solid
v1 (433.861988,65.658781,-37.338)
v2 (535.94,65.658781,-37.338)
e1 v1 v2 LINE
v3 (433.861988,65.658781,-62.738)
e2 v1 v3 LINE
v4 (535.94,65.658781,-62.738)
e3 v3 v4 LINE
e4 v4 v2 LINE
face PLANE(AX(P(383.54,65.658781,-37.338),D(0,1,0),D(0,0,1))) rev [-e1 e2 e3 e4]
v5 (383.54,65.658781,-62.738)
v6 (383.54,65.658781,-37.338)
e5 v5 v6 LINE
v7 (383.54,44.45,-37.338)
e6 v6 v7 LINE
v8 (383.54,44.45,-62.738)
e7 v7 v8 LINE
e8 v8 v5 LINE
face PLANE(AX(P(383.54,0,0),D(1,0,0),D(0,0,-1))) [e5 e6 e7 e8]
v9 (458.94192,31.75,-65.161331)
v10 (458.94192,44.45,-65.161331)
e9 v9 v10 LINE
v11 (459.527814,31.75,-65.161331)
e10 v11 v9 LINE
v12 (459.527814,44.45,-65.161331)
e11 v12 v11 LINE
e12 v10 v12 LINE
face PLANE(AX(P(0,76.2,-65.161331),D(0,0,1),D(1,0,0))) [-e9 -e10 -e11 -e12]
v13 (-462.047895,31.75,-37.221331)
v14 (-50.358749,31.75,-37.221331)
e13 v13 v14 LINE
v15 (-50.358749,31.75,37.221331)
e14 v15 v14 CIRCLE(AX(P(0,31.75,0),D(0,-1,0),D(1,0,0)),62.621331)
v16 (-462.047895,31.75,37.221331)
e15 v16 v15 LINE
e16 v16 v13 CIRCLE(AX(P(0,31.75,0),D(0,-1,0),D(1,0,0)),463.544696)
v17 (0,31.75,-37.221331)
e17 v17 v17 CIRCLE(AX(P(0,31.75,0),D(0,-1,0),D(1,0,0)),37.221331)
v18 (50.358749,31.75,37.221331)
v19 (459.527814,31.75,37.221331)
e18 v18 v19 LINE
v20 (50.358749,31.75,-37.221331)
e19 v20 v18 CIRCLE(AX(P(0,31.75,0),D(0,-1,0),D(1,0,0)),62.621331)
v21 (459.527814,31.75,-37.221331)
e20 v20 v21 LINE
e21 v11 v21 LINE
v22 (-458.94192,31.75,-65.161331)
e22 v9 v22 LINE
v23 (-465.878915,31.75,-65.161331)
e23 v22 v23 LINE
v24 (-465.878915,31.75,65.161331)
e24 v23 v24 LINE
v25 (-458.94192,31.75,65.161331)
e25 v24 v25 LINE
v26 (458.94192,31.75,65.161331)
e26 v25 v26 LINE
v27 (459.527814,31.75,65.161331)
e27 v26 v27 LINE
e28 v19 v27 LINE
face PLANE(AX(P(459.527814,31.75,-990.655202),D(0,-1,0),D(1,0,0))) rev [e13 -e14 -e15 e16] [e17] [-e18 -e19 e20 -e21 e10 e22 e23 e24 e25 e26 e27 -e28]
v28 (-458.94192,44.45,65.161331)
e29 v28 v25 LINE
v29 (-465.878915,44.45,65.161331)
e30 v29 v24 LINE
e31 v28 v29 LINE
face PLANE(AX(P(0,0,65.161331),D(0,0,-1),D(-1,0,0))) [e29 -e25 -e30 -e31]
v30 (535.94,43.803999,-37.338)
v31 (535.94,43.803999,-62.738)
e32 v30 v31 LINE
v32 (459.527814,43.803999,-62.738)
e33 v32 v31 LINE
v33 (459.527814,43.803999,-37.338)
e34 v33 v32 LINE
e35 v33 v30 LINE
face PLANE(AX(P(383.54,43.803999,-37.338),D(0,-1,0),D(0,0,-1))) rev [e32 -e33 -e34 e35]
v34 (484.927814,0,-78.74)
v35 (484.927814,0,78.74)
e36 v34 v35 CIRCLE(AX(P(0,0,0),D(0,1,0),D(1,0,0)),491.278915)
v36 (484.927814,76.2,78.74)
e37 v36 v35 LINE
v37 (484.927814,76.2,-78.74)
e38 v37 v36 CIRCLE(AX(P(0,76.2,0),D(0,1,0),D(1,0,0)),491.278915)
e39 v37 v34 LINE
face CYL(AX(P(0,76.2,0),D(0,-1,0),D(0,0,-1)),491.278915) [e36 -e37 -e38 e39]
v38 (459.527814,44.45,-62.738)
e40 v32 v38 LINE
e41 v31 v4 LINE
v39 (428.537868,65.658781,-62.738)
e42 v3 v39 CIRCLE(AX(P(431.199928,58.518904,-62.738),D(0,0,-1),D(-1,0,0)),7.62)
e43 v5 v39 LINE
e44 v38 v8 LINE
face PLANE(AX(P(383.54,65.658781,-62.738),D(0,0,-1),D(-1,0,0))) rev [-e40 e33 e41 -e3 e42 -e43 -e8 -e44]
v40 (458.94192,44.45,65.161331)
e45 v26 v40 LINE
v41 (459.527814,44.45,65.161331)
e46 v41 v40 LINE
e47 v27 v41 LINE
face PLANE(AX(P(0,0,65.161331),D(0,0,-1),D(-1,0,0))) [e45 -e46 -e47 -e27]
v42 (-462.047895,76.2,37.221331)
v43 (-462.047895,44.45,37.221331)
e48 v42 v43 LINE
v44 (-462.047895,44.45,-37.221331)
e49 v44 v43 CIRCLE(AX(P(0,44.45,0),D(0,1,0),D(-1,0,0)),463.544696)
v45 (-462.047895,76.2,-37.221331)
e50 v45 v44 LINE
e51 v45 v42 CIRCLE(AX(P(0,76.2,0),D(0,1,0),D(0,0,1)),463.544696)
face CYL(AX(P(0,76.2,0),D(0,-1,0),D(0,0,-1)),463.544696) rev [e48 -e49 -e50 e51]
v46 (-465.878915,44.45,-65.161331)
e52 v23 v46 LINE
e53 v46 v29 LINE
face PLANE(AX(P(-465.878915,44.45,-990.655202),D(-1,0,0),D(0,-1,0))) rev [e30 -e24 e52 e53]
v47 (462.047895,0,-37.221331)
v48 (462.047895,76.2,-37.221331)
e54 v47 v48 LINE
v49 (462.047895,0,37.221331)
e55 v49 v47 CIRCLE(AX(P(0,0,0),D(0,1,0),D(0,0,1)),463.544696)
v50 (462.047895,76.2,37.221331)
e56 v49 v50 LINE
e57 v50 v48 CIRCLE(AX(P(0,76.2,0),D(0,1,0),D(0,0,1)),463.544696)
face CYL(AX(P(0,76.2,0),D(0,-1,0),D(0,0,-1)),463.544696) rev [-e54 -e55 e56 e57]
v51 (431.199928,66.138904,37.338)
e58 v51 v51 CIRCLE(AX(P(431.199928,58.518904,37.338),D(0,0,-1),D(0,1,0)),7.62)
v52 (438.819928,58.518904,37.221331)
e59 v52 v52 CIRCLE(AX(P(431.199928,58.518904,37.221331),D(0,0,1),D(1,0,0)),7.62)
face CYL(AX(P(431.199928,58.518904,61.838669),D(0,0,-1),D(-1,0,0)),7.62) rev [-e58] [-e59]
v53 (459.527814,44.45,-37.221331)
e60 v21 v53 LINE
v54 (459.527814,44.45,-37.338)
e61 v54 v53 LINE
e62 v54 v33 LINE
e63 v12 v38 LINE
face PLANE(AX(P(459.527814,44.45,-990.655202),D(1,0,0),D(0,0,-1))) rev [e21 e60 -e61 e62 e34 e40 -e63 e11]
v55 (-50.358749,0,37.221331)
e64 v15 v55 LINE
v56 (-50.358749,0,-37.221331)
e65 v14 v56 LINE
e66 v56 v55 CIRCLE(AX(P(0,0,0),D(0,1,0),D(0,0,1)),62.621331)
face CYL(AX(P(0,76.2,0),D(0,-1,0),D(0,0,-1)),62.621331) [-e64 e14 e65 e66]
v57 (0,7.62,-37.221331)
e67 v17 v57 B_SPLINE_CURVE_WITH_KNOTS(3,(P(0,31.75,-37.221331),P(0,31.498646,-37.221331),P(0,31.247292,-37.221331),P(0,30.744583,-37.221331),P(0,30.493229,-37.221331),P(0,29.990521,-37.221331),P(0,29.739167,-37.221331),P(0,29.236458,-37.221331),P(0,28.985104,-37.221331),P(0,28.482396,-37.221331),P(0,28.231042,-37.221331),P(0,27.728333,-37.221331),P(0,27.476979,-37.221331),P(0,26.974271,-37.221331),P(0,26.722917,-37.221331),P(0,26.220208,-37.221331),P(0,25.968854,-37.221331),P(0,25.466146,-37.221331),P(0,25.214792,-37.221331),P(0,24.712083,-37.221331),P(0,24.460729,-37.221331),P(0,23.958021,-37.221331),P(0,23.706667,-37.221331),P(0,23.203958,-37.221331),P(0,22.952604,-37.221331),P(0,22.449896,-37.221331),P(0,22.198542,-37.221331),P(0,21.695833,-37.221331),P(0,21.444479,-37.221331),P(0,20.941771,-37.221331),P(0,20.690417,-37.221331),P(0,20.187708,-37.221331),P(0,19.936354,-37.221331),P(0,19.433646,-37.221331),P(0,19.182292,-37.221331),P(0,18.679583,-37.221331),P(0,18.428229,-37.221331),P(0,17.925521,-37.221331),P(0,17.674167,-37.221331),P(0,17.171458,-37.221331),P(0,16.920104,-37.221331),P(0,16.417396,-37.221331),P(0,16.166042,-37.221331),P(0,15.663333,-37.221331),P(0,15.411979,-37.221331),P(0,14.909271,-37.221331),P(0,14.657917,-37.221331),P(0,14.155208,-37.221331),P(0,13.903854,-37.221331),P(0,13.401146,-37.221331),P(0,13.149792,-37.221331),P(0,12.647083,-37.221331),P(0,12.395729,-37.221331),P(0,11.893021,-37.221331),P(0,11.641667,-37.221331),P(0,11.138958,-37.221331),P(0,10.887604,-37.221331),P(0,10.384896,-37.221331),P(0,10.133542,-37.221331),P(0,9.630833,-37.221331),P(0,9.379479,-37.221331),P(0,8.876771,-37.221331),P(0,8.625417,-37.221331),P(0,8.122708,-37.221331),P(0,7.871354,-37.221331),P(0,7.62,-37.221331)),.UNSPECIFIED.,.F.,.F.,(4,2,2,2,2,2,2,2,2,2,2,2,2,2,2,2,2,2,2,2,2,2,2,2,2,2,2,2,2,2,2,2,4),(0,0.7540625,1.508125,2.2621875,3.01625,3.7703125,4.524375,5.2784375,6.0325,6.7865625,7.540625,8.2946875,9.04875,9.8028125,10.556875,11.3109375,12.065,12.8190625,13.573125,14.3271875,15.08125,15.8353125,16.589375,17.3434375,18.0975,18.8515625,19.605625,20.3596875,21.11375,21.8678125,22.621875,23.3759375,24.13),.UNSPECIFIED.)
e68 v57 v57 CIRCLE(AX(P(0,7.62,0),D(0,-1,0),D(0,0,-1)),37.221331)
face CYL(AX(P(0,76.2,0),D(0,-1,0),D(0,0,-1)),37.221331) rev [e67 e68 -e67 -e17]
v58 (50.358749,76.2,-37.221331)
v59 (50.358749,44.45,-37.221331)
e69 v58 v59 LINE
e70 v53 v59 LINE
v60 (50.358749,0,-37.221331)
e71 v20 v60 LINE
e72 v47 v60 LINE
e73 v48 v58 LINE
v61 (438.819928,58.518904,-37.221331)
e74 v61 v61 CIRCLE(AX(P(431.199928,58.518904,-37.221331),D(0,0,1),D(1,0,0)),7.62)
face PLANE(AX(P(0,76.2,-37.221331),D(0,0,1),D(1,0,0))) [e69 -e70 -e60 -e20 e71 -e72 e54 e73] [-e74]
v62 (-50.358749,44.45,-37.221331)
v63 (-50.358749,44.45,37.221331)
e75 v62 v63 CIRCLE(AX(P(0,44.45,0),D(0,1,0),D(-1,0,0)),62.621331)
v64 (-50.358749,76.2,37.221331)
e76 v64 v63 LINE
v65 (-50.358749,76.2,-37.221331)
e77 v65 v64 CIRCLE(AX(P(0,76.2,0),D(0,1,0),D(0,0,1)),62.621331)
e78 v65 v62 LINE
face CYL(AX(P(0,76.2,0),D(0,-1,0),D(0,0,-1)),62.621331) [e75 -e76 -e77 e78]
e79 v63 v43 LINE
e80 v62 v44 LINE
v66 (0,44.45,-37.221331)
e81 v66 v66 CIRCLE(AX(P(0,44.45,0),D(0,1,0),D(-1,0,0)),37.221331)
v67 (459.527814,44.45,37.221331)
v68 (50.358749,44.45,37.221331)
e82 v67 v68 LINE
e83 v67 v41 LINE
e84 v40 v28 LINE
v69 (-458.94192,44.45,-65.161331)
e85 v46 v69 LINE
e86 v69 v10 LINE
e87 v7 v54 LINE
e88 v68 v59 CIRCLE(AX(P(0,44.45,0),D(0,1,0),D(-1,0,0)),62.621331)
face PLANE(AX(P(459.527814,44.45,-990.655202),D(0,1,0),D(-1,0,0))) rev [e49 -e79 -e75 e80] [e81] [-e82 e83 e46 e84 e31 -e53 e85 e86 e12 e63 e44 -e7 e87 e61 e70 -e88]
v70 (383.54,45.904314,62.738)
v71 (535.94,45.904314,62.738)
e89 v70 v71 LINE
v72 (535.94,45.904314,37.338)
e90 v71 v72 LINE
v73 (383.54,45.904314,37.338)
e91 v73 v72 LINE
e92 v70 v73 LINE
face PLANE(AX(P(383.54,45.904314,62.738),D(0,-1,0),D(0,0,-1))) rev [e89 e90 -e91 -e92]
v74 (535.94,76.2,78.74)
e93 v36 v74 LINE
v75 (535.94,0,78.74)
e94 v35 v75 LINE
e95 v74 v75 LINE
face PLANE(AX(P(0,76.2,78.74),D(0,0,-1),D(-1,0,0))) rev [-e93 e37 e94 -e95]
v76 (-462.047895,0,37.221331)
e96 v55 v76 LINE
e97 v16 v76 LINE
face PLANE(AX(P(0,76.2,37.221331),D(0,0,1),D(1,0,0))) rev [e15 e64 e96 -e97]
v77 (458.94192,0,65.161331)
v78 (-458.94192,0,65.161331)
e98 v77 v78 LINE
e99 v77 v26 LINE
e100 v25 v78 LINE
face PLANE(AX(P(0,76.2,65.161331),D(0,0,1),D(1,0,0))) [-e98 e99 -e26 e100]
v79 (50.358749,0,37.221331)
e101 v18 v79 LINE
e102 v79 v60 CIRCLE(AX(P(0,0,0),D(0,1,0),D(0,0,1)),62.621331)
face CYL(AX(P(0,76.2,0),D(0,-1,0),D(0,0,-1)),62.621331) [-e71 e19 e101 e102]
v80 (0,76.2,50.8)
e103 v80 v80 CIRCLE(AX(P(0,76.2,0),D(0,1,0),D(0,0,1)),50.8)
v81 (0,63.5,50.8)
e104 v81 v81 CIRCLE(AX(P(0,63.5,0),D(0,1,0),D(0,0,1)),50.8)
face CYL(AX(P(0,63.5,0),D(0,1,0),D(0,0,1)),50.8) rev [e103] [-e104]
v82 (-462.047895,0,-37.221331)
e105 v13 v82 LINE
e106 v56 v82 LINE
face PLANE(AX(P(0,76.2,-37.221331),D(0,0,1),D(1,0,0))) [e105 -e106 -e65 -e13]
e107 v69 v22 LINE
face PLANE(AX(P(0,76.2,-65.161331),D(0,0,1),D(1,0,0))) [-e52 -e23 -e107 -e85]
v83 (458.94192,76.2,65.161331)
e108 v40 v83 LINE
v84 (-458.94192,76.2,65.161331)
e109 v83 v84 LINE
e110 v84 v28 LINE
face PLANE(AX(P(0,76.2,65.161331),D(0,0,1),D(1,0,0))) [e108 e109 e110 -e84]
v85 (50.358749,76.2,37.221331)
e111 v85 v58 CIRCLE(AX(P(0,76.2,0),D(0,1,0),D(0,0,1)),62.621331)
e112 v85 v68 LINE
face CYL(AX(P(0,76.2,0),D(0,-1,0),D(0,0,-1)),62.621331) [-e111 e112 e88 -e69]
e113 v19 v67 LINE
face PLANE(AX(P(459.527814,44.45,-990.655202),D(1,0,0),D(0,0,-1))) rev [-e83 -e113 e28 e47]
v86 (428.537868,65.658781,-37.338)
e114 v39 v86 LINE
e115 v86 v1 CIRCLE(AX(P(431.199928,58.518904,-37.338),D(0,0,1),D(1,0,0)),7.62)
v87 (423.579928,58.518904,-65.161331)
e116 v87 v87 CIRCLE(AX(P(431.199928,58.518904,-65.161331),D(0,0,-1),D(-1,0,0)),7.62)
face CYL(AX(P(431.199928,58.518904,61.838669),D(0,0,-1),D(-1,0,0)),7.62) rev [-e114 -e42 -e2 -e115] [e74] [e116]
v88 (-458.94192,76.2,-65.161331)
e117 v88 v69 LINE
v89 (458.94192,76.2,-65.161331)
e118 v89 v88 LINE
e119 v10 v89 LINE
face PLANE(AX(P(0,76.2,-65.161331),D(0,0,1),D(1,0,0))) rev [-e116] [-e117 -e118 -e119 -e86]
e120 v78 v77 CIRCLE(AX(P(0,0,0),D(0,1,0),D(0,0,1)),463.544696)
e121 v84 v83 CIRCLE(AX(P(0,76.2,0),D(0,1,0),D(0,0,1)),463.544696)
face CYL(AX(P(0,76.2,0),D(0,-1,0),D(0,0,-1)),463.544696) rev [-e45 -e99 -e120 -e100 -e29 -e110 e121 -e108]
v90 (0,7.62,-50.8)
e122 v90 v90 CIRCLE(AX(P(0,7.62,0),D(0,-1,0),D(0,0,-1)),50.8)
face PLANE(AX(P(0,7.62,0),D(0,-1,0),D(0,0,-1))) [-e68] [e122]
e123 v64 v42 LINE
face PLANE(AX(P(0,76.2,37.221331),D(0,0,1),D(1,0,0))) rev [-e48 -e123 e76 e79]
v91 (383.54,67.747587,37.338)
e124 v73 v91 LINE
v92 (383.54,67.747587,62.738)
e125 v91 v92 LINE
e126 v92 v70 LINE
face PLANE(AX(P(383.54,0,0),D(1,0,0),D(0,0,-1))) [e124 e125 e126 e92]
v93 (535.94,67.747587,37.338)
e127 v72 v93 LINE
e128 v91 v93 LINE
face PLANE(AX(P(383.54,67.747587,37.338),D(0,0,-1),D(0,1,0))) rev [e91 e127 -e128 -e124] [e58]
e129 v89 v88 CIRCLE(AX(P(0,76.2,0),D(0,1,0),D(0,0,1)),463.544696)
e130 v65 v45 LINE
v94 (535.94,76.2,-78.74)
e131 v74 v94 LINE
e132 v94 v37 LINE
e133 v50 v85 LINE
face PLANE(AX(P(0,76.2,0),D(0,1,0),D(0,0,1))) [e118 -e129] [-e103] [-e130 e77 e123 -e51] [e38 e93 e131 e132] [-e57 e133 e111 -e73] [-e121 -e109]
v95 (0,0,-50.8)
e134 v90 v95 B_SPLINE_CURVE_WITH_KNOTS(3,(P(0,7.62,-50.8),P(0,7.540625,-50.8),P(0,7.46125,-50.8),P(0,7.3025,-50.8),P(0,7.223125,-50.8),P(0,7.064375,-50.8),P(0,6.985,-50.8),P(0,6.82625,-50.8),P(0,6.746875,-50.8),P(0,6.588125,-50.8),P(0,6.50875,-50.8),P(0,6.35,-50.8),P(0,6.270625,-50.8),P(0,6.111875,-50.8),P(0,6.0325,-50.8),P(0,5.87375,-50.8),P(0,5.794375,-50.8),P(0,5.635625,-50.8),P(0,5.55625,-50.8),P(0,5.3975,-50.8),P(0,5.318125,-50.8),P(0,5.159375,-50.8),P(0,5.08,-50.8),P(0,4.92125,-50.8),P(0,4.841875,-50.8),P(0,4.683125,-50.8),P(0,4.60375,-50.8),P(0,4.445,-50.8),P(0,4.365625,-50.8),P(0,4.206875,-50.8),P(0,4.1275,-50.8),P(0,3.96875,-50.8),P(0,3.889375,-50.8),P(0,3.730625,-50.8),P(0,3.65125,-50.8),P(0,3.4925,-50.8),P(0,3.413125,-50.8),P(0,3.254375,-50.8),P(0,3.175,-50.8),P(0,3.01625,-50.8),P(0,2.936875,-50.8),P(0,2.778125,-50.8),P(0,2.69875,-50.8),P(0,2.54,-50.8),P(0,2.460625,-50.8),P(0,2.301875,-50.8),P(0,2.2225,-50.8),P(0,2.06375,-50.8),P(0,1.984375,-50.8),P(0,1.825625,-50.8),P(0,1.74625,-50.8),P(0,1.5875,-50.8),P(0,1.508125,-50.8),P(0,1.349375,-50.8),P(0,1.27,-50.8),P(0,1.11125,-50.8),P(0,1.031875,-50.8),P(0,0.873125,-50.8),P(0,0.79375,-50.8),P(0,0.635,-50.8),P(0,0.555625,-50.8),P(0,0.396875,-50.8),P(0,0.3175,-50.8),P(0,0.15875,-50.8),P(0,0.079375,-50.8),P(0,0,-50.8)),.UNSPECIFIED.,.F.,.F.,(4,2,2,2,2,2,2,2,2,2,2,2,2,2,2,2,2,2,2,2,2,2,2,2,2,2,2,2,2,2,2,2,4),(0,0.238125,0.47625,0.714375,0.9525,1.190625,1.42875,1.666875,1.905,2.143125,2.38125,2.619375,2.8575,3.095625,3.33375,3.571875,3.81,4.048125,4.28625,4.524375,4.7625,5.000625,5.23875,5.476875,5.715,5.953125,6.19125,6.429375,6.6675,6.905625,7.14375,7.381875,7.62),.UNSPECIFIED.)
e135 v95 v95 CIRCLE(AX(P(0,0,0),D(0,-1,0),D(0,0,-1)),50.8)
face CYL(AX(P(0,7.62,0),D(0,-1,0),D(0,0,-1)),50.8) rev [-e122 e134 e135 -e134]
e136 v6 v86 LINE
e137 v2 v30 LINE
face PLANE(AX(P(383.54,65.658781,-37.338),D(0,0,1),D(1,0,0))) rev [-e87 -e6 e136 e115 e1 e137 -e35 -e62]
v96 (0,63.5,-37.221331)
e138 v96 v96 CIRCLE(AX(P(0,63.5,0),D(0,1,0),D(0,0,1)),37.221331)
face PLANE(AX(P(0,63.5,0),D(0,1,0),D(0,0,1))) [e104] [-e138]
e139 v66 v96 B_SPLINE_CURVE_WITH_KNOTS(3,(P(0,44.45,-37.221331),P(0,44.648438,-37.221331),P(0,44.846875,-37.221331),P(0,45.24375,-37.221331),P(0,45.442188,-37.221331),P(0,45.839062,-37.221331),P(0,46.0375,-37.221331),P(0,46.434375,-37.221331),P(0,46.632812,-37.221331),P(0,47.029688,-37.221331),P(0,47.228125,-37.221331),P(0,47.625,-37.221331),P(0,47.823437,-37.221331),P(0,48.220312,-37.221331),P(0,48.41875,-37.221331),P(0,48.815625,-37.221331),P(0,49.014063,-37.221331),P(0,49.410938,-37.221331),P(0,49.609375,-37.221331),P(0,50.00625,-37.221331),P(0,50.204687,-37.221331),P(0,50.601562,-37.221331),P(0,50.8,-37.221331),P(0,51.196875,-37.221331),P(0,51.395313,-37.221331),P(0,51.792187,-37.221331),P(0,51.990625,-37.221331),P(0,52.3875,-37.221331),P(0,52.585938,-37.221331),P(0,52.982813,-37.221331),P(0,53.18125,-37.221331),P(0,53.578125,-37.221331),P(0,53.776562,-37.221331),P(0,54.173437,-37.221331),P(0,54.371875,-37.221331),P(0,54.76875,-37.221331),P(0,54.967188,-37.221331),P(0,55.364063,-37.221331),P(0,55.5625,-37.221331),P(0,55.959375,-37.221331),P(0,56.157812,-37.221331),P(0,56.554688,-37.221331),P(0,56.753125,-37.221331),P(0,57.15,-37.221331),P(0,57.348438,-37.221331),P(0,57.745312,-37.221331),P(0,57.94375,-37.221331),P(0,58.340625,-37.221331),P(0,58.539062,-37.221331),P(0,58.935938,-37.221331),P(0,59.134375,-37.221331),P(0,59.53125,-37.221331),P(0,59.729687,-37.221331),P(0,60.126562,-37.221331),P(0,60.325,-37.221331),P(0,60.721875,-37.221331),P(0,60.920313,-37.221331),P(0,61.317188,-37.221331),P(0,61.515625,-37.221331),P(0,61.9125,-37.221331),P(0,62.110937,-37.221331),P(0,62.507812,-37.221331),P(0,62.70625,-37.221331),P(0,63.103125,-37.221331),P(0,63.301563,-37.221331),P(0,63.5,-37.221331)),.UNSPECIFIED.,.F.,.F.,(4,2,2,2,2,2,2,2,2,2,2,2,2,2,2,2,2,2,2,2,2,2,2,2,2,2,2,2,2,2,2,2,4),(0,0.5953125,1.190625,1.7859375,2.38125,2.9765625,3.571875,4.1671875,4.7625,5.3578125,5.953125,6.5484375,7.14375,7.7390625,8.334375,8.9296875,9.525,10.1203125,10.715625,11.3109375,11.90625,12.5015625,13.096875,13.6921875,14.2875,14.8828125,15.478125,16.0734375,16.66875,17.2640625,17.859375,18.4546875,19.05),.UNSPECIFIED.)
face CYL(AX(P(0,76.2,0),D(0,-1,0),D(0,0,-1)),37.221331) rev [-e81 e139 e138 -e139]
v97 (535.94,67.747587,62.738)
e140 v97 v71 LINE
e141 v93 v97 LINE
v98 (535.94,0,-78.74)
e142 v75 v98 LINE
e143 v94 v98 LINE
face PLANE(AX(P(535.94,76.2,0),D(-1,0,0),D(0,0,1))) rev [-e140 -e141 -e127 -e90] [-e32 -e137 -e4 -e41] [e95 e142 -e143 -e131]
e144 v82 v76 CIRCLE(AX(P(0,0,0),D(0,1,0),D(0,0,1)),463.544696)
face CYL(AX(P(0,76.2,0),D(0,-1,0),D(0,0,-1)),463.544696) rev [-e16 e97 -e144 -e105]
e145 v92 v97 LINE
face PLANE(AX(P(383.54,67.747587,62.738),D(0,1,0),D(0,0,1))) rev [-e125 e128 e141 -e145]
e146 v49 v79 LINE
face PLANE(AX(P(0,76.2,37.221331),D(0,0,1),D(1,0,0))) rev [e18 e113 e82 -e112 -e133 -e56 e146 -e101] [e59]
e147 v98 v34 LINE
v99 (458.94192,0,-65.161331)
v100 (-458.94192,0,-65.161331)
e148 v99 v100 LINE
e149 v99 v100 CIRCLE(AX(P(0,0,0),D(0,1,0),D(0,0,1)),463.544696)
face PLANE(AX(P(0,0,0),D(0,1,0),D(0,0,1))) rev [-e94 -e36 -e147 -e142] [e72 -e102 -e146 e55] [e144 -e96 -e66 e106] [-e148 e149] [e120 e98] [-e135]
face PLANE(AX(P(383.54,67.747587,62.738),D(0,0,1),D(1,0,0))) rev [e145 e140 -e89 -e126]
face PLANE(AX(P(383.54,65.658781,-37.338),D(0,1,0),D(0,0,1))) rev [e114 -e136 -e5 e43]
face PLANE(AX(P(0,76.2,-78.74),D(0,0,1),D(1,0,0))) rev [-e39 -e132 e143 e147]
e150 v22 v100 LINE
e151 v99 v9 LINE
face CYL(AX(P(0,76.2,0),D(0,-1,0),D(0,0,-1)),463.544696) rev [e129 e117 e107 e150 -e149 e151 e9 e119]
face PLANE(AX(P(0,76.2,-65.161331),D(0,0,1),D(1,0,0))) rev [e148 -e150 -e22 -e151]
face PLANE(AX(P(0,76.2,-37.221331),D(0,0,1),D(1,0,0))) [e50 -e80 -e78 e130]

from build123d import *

# Parameters (mm, degrees)
SKETCH1_R           = 463.544695529
BOSS_EXTRUDE2_DEPTH = 76.2
EXTRUDE_THIN1_DEPTH = 76.2
SKETCH3_R           = 37.22133085
BOSS_EXTRUDE3_DEPTH = 76.2
SKETCH4_W           = 925.4067294
SKETCH4_H           = 12.7
CUT_EXTRUDE1_DEPTH  = 130.322661699
SKETCH5_R           = 50.8
CUT_EXTRUDE2_DEPTH  = 12.7
CUT_EXTRUDE3_START  = -7.62
SKETCH6_R           = 50.8
CUT_EXTRUDE3_DEPTH  = 7.62
SKETCH8_W           = 25.4
SKETCH8_H           = 21.854781484
SKETCH8_H_2         = 21.84327291
CUT_EXTRUDE4_DEPTH  = 152.4
SKETCH9_R           = 7.62
CUT_EXTRUDE5_DEPTH  = 127


# Read off the part's stored shape, not the designer's step: Extrude-Thin1
with BuildPart() as part:
    # Sketch1 → Boss-Extrude2 (new body)
    with BuildSketch(Plane(origin=(0, 0, 0), x_dir=(1, 0, 0), z_dir=(0, 1, 0))):
        with BuildLine():
            Line((533.4, -76.2), (533.4, 76.2))
            Line((533.4, 76.2), (482.762143569, 76.2))
            ThreePointArc((482.762143569, 76.2), (-488.738915233, 0), (482.762143569, -76.2))
            Line((482.762143569, -76.2), (533.4, -76.2))
        make_face()
        with Locations(Location((0, 0, 0), (0, 0, 90))):
            Circle(SKETCH1_R, mode=Mode.SUBTRACT)
    extrude(amount=BOSS_EXTRUDE2_DEPTH)

    # Extrude-Thin1 outline → Extrude-Thin1 (add)
    with BuildSketch(Plane(origin=(0, 0, 0), x_dir=(1, 0, 0), z_dir=(0, 1, 0))):
        with BuildLine():
            Line((535.94, -78.74), (535.94, 78.74))
            Line((535.94, 78.74), (484.927814167, 78.74))
            ThreePointArc((484.927814167, 78.74), (-491.278915233, 0), (484.927814167, -78.74))
            Line((484.927814167, -78.74), (535.94, -78.74))
        make_face()
        with BuildLine():
            ThreePointArc((482.762143569, -76.2), (-488.738915233, 0), (482.762143569, 76.2))
            Line((482.762143569, 76.2), (533.4, 76.2))
            Line((533.4, 76.2), (533.4, -76.2))
            Line((533.4, -76.2), (482.762143569, -76.2))
        make_face(mode=Mode.SUBTRACT)
    extrude(amount=EXTRUDE_THIN1_DEPTH)

    # Sketch3 → Boss-Extrude3 (add)
    with BuildSketch(Plane(origin=(0, 0, 0), x_dir=(1, 0, 0), z_dir=(0, 1, 0))):
        with BuildLine():
            Line((50.358749063, 37.22133085), (464.47679922, 37.22133085))
            ThreePointArc((464.47679922, 37.22133085), (463.142727121, 51.21463461), (461.387175207, 65.16133085))
            Line((461.387175207, 65.16133085), (-461.387175207, 65.16133085))
            ThreePointArc((-461.387175207, 65.16133085), (-463.142727121, 51.21463461), (-464.47679922, 37.22133085))
            Line((-464.47679922, 37.22133085), (-50.358749063, 37.22133085))
            ThreePointArc((-50.358749063, 37.22133085), (-62.62133085, 0), (-50.358749063, -37.22133085))
            Line((-50.358749063, -37.22133085), (-464.47679922, -37.22133085))
            ThreePointArc((-464.47679922, -37.22133085), (-463.142727121, -51.21463461), (-461.387175207, -65.16133085))
            Line((-461.387175207, -65.16133085), (461.387175207, -65.16133085))
            ThreePointArc((461.387175207, -65.16133085), (463.142727121, -51.21463461), (464.47679922, -37.22133085))
            Line((464.47679922, -37.22133085), (50.358749063, -37.22133085))
            ThreePointArc((50.358749063, -37.22133085), (62.62133085, 0), (50.358749063, 37.22133085))
        make_face()
        with Locations(Location((0, 0, 0), (0, 0, 90))):
            Circle(SKETCH3_R, mode=Mode.SUBTRACT)
    extrude(amount=BOSS_EXTRUDE3_DEPTH)

    # Sketch4 → Cut-Extrude1 (cut)
    with BuildSketch(Plane.XY.offset(65.16133085)):
        with Locations((-3.175550533, 38.1)):
            Rectangle(SKETCH4_W, SKETCH4_H)
    extrude(amount=-CUT_EXTRUDE1_DEPTH, mode=Mode.SUBTRACT)

    # Sketch5 → Cut-Extrude2 (cut)
    with BuildSketch(Plane(origin=(0, 76.2, 0), x_dir=(1, 0, 0), z_dir=(0, 1, 0))):
        with Locations(Location((0, 0, 0), (0, 0, 270))):
            Circle(SKETCH5_R)
    extrude(amount=-CUT_EXTRUDE2_DEPTH, mode=Mode.SUBTRACT)

    # Sketch6 → Cut-Extrude3 (cut)
    with BuildSketch(Plane.XZ.offset(CUT_EXTRUDE3_START)):
        with Locations(Location((0, 0, 0), (0, 0, 90))):
            Circle(SKETCH6_R)
    extrude(amount=CUT_EXTRUDE3_DEPTH, mode=Mode.SUBTRACT)

    # Sketch8 → Cut-Extrude4 (cut)
    with BuildSketch(Plane(origin=(535.94, 0, 0), x_dir=(0, 0, -1), z_dir=(1, 0, 0))):
        with Locations((50.038, 54.731390154)):
            Rectangle(SKETCH8_W, SKETCH8_H)
        with Locations((-50.038, 56.82595057)):
            Rectangle(SKETCH8_W, SKETCH8_H_2)
    extrude(amount=-CUT_EXTRUDE4_DEPTH, mode=Mode.SUBTRACT)

    # Sketch9 → Cut-Extrude5 (cut)
    with BuildSketch(Plane(origin=(0, 0, -65.16133085), x_dir=(-1, 0, 0), z_dir=(0, 0, -1))):
        with Locations((-431.199928215, 58.518904378)):
            Circle(SKETCH9_R)
    extrude(amount=-CUT_EXTRUDE5_DEPTH, mode=Mode.SUBTRACT)


solid = part.part
